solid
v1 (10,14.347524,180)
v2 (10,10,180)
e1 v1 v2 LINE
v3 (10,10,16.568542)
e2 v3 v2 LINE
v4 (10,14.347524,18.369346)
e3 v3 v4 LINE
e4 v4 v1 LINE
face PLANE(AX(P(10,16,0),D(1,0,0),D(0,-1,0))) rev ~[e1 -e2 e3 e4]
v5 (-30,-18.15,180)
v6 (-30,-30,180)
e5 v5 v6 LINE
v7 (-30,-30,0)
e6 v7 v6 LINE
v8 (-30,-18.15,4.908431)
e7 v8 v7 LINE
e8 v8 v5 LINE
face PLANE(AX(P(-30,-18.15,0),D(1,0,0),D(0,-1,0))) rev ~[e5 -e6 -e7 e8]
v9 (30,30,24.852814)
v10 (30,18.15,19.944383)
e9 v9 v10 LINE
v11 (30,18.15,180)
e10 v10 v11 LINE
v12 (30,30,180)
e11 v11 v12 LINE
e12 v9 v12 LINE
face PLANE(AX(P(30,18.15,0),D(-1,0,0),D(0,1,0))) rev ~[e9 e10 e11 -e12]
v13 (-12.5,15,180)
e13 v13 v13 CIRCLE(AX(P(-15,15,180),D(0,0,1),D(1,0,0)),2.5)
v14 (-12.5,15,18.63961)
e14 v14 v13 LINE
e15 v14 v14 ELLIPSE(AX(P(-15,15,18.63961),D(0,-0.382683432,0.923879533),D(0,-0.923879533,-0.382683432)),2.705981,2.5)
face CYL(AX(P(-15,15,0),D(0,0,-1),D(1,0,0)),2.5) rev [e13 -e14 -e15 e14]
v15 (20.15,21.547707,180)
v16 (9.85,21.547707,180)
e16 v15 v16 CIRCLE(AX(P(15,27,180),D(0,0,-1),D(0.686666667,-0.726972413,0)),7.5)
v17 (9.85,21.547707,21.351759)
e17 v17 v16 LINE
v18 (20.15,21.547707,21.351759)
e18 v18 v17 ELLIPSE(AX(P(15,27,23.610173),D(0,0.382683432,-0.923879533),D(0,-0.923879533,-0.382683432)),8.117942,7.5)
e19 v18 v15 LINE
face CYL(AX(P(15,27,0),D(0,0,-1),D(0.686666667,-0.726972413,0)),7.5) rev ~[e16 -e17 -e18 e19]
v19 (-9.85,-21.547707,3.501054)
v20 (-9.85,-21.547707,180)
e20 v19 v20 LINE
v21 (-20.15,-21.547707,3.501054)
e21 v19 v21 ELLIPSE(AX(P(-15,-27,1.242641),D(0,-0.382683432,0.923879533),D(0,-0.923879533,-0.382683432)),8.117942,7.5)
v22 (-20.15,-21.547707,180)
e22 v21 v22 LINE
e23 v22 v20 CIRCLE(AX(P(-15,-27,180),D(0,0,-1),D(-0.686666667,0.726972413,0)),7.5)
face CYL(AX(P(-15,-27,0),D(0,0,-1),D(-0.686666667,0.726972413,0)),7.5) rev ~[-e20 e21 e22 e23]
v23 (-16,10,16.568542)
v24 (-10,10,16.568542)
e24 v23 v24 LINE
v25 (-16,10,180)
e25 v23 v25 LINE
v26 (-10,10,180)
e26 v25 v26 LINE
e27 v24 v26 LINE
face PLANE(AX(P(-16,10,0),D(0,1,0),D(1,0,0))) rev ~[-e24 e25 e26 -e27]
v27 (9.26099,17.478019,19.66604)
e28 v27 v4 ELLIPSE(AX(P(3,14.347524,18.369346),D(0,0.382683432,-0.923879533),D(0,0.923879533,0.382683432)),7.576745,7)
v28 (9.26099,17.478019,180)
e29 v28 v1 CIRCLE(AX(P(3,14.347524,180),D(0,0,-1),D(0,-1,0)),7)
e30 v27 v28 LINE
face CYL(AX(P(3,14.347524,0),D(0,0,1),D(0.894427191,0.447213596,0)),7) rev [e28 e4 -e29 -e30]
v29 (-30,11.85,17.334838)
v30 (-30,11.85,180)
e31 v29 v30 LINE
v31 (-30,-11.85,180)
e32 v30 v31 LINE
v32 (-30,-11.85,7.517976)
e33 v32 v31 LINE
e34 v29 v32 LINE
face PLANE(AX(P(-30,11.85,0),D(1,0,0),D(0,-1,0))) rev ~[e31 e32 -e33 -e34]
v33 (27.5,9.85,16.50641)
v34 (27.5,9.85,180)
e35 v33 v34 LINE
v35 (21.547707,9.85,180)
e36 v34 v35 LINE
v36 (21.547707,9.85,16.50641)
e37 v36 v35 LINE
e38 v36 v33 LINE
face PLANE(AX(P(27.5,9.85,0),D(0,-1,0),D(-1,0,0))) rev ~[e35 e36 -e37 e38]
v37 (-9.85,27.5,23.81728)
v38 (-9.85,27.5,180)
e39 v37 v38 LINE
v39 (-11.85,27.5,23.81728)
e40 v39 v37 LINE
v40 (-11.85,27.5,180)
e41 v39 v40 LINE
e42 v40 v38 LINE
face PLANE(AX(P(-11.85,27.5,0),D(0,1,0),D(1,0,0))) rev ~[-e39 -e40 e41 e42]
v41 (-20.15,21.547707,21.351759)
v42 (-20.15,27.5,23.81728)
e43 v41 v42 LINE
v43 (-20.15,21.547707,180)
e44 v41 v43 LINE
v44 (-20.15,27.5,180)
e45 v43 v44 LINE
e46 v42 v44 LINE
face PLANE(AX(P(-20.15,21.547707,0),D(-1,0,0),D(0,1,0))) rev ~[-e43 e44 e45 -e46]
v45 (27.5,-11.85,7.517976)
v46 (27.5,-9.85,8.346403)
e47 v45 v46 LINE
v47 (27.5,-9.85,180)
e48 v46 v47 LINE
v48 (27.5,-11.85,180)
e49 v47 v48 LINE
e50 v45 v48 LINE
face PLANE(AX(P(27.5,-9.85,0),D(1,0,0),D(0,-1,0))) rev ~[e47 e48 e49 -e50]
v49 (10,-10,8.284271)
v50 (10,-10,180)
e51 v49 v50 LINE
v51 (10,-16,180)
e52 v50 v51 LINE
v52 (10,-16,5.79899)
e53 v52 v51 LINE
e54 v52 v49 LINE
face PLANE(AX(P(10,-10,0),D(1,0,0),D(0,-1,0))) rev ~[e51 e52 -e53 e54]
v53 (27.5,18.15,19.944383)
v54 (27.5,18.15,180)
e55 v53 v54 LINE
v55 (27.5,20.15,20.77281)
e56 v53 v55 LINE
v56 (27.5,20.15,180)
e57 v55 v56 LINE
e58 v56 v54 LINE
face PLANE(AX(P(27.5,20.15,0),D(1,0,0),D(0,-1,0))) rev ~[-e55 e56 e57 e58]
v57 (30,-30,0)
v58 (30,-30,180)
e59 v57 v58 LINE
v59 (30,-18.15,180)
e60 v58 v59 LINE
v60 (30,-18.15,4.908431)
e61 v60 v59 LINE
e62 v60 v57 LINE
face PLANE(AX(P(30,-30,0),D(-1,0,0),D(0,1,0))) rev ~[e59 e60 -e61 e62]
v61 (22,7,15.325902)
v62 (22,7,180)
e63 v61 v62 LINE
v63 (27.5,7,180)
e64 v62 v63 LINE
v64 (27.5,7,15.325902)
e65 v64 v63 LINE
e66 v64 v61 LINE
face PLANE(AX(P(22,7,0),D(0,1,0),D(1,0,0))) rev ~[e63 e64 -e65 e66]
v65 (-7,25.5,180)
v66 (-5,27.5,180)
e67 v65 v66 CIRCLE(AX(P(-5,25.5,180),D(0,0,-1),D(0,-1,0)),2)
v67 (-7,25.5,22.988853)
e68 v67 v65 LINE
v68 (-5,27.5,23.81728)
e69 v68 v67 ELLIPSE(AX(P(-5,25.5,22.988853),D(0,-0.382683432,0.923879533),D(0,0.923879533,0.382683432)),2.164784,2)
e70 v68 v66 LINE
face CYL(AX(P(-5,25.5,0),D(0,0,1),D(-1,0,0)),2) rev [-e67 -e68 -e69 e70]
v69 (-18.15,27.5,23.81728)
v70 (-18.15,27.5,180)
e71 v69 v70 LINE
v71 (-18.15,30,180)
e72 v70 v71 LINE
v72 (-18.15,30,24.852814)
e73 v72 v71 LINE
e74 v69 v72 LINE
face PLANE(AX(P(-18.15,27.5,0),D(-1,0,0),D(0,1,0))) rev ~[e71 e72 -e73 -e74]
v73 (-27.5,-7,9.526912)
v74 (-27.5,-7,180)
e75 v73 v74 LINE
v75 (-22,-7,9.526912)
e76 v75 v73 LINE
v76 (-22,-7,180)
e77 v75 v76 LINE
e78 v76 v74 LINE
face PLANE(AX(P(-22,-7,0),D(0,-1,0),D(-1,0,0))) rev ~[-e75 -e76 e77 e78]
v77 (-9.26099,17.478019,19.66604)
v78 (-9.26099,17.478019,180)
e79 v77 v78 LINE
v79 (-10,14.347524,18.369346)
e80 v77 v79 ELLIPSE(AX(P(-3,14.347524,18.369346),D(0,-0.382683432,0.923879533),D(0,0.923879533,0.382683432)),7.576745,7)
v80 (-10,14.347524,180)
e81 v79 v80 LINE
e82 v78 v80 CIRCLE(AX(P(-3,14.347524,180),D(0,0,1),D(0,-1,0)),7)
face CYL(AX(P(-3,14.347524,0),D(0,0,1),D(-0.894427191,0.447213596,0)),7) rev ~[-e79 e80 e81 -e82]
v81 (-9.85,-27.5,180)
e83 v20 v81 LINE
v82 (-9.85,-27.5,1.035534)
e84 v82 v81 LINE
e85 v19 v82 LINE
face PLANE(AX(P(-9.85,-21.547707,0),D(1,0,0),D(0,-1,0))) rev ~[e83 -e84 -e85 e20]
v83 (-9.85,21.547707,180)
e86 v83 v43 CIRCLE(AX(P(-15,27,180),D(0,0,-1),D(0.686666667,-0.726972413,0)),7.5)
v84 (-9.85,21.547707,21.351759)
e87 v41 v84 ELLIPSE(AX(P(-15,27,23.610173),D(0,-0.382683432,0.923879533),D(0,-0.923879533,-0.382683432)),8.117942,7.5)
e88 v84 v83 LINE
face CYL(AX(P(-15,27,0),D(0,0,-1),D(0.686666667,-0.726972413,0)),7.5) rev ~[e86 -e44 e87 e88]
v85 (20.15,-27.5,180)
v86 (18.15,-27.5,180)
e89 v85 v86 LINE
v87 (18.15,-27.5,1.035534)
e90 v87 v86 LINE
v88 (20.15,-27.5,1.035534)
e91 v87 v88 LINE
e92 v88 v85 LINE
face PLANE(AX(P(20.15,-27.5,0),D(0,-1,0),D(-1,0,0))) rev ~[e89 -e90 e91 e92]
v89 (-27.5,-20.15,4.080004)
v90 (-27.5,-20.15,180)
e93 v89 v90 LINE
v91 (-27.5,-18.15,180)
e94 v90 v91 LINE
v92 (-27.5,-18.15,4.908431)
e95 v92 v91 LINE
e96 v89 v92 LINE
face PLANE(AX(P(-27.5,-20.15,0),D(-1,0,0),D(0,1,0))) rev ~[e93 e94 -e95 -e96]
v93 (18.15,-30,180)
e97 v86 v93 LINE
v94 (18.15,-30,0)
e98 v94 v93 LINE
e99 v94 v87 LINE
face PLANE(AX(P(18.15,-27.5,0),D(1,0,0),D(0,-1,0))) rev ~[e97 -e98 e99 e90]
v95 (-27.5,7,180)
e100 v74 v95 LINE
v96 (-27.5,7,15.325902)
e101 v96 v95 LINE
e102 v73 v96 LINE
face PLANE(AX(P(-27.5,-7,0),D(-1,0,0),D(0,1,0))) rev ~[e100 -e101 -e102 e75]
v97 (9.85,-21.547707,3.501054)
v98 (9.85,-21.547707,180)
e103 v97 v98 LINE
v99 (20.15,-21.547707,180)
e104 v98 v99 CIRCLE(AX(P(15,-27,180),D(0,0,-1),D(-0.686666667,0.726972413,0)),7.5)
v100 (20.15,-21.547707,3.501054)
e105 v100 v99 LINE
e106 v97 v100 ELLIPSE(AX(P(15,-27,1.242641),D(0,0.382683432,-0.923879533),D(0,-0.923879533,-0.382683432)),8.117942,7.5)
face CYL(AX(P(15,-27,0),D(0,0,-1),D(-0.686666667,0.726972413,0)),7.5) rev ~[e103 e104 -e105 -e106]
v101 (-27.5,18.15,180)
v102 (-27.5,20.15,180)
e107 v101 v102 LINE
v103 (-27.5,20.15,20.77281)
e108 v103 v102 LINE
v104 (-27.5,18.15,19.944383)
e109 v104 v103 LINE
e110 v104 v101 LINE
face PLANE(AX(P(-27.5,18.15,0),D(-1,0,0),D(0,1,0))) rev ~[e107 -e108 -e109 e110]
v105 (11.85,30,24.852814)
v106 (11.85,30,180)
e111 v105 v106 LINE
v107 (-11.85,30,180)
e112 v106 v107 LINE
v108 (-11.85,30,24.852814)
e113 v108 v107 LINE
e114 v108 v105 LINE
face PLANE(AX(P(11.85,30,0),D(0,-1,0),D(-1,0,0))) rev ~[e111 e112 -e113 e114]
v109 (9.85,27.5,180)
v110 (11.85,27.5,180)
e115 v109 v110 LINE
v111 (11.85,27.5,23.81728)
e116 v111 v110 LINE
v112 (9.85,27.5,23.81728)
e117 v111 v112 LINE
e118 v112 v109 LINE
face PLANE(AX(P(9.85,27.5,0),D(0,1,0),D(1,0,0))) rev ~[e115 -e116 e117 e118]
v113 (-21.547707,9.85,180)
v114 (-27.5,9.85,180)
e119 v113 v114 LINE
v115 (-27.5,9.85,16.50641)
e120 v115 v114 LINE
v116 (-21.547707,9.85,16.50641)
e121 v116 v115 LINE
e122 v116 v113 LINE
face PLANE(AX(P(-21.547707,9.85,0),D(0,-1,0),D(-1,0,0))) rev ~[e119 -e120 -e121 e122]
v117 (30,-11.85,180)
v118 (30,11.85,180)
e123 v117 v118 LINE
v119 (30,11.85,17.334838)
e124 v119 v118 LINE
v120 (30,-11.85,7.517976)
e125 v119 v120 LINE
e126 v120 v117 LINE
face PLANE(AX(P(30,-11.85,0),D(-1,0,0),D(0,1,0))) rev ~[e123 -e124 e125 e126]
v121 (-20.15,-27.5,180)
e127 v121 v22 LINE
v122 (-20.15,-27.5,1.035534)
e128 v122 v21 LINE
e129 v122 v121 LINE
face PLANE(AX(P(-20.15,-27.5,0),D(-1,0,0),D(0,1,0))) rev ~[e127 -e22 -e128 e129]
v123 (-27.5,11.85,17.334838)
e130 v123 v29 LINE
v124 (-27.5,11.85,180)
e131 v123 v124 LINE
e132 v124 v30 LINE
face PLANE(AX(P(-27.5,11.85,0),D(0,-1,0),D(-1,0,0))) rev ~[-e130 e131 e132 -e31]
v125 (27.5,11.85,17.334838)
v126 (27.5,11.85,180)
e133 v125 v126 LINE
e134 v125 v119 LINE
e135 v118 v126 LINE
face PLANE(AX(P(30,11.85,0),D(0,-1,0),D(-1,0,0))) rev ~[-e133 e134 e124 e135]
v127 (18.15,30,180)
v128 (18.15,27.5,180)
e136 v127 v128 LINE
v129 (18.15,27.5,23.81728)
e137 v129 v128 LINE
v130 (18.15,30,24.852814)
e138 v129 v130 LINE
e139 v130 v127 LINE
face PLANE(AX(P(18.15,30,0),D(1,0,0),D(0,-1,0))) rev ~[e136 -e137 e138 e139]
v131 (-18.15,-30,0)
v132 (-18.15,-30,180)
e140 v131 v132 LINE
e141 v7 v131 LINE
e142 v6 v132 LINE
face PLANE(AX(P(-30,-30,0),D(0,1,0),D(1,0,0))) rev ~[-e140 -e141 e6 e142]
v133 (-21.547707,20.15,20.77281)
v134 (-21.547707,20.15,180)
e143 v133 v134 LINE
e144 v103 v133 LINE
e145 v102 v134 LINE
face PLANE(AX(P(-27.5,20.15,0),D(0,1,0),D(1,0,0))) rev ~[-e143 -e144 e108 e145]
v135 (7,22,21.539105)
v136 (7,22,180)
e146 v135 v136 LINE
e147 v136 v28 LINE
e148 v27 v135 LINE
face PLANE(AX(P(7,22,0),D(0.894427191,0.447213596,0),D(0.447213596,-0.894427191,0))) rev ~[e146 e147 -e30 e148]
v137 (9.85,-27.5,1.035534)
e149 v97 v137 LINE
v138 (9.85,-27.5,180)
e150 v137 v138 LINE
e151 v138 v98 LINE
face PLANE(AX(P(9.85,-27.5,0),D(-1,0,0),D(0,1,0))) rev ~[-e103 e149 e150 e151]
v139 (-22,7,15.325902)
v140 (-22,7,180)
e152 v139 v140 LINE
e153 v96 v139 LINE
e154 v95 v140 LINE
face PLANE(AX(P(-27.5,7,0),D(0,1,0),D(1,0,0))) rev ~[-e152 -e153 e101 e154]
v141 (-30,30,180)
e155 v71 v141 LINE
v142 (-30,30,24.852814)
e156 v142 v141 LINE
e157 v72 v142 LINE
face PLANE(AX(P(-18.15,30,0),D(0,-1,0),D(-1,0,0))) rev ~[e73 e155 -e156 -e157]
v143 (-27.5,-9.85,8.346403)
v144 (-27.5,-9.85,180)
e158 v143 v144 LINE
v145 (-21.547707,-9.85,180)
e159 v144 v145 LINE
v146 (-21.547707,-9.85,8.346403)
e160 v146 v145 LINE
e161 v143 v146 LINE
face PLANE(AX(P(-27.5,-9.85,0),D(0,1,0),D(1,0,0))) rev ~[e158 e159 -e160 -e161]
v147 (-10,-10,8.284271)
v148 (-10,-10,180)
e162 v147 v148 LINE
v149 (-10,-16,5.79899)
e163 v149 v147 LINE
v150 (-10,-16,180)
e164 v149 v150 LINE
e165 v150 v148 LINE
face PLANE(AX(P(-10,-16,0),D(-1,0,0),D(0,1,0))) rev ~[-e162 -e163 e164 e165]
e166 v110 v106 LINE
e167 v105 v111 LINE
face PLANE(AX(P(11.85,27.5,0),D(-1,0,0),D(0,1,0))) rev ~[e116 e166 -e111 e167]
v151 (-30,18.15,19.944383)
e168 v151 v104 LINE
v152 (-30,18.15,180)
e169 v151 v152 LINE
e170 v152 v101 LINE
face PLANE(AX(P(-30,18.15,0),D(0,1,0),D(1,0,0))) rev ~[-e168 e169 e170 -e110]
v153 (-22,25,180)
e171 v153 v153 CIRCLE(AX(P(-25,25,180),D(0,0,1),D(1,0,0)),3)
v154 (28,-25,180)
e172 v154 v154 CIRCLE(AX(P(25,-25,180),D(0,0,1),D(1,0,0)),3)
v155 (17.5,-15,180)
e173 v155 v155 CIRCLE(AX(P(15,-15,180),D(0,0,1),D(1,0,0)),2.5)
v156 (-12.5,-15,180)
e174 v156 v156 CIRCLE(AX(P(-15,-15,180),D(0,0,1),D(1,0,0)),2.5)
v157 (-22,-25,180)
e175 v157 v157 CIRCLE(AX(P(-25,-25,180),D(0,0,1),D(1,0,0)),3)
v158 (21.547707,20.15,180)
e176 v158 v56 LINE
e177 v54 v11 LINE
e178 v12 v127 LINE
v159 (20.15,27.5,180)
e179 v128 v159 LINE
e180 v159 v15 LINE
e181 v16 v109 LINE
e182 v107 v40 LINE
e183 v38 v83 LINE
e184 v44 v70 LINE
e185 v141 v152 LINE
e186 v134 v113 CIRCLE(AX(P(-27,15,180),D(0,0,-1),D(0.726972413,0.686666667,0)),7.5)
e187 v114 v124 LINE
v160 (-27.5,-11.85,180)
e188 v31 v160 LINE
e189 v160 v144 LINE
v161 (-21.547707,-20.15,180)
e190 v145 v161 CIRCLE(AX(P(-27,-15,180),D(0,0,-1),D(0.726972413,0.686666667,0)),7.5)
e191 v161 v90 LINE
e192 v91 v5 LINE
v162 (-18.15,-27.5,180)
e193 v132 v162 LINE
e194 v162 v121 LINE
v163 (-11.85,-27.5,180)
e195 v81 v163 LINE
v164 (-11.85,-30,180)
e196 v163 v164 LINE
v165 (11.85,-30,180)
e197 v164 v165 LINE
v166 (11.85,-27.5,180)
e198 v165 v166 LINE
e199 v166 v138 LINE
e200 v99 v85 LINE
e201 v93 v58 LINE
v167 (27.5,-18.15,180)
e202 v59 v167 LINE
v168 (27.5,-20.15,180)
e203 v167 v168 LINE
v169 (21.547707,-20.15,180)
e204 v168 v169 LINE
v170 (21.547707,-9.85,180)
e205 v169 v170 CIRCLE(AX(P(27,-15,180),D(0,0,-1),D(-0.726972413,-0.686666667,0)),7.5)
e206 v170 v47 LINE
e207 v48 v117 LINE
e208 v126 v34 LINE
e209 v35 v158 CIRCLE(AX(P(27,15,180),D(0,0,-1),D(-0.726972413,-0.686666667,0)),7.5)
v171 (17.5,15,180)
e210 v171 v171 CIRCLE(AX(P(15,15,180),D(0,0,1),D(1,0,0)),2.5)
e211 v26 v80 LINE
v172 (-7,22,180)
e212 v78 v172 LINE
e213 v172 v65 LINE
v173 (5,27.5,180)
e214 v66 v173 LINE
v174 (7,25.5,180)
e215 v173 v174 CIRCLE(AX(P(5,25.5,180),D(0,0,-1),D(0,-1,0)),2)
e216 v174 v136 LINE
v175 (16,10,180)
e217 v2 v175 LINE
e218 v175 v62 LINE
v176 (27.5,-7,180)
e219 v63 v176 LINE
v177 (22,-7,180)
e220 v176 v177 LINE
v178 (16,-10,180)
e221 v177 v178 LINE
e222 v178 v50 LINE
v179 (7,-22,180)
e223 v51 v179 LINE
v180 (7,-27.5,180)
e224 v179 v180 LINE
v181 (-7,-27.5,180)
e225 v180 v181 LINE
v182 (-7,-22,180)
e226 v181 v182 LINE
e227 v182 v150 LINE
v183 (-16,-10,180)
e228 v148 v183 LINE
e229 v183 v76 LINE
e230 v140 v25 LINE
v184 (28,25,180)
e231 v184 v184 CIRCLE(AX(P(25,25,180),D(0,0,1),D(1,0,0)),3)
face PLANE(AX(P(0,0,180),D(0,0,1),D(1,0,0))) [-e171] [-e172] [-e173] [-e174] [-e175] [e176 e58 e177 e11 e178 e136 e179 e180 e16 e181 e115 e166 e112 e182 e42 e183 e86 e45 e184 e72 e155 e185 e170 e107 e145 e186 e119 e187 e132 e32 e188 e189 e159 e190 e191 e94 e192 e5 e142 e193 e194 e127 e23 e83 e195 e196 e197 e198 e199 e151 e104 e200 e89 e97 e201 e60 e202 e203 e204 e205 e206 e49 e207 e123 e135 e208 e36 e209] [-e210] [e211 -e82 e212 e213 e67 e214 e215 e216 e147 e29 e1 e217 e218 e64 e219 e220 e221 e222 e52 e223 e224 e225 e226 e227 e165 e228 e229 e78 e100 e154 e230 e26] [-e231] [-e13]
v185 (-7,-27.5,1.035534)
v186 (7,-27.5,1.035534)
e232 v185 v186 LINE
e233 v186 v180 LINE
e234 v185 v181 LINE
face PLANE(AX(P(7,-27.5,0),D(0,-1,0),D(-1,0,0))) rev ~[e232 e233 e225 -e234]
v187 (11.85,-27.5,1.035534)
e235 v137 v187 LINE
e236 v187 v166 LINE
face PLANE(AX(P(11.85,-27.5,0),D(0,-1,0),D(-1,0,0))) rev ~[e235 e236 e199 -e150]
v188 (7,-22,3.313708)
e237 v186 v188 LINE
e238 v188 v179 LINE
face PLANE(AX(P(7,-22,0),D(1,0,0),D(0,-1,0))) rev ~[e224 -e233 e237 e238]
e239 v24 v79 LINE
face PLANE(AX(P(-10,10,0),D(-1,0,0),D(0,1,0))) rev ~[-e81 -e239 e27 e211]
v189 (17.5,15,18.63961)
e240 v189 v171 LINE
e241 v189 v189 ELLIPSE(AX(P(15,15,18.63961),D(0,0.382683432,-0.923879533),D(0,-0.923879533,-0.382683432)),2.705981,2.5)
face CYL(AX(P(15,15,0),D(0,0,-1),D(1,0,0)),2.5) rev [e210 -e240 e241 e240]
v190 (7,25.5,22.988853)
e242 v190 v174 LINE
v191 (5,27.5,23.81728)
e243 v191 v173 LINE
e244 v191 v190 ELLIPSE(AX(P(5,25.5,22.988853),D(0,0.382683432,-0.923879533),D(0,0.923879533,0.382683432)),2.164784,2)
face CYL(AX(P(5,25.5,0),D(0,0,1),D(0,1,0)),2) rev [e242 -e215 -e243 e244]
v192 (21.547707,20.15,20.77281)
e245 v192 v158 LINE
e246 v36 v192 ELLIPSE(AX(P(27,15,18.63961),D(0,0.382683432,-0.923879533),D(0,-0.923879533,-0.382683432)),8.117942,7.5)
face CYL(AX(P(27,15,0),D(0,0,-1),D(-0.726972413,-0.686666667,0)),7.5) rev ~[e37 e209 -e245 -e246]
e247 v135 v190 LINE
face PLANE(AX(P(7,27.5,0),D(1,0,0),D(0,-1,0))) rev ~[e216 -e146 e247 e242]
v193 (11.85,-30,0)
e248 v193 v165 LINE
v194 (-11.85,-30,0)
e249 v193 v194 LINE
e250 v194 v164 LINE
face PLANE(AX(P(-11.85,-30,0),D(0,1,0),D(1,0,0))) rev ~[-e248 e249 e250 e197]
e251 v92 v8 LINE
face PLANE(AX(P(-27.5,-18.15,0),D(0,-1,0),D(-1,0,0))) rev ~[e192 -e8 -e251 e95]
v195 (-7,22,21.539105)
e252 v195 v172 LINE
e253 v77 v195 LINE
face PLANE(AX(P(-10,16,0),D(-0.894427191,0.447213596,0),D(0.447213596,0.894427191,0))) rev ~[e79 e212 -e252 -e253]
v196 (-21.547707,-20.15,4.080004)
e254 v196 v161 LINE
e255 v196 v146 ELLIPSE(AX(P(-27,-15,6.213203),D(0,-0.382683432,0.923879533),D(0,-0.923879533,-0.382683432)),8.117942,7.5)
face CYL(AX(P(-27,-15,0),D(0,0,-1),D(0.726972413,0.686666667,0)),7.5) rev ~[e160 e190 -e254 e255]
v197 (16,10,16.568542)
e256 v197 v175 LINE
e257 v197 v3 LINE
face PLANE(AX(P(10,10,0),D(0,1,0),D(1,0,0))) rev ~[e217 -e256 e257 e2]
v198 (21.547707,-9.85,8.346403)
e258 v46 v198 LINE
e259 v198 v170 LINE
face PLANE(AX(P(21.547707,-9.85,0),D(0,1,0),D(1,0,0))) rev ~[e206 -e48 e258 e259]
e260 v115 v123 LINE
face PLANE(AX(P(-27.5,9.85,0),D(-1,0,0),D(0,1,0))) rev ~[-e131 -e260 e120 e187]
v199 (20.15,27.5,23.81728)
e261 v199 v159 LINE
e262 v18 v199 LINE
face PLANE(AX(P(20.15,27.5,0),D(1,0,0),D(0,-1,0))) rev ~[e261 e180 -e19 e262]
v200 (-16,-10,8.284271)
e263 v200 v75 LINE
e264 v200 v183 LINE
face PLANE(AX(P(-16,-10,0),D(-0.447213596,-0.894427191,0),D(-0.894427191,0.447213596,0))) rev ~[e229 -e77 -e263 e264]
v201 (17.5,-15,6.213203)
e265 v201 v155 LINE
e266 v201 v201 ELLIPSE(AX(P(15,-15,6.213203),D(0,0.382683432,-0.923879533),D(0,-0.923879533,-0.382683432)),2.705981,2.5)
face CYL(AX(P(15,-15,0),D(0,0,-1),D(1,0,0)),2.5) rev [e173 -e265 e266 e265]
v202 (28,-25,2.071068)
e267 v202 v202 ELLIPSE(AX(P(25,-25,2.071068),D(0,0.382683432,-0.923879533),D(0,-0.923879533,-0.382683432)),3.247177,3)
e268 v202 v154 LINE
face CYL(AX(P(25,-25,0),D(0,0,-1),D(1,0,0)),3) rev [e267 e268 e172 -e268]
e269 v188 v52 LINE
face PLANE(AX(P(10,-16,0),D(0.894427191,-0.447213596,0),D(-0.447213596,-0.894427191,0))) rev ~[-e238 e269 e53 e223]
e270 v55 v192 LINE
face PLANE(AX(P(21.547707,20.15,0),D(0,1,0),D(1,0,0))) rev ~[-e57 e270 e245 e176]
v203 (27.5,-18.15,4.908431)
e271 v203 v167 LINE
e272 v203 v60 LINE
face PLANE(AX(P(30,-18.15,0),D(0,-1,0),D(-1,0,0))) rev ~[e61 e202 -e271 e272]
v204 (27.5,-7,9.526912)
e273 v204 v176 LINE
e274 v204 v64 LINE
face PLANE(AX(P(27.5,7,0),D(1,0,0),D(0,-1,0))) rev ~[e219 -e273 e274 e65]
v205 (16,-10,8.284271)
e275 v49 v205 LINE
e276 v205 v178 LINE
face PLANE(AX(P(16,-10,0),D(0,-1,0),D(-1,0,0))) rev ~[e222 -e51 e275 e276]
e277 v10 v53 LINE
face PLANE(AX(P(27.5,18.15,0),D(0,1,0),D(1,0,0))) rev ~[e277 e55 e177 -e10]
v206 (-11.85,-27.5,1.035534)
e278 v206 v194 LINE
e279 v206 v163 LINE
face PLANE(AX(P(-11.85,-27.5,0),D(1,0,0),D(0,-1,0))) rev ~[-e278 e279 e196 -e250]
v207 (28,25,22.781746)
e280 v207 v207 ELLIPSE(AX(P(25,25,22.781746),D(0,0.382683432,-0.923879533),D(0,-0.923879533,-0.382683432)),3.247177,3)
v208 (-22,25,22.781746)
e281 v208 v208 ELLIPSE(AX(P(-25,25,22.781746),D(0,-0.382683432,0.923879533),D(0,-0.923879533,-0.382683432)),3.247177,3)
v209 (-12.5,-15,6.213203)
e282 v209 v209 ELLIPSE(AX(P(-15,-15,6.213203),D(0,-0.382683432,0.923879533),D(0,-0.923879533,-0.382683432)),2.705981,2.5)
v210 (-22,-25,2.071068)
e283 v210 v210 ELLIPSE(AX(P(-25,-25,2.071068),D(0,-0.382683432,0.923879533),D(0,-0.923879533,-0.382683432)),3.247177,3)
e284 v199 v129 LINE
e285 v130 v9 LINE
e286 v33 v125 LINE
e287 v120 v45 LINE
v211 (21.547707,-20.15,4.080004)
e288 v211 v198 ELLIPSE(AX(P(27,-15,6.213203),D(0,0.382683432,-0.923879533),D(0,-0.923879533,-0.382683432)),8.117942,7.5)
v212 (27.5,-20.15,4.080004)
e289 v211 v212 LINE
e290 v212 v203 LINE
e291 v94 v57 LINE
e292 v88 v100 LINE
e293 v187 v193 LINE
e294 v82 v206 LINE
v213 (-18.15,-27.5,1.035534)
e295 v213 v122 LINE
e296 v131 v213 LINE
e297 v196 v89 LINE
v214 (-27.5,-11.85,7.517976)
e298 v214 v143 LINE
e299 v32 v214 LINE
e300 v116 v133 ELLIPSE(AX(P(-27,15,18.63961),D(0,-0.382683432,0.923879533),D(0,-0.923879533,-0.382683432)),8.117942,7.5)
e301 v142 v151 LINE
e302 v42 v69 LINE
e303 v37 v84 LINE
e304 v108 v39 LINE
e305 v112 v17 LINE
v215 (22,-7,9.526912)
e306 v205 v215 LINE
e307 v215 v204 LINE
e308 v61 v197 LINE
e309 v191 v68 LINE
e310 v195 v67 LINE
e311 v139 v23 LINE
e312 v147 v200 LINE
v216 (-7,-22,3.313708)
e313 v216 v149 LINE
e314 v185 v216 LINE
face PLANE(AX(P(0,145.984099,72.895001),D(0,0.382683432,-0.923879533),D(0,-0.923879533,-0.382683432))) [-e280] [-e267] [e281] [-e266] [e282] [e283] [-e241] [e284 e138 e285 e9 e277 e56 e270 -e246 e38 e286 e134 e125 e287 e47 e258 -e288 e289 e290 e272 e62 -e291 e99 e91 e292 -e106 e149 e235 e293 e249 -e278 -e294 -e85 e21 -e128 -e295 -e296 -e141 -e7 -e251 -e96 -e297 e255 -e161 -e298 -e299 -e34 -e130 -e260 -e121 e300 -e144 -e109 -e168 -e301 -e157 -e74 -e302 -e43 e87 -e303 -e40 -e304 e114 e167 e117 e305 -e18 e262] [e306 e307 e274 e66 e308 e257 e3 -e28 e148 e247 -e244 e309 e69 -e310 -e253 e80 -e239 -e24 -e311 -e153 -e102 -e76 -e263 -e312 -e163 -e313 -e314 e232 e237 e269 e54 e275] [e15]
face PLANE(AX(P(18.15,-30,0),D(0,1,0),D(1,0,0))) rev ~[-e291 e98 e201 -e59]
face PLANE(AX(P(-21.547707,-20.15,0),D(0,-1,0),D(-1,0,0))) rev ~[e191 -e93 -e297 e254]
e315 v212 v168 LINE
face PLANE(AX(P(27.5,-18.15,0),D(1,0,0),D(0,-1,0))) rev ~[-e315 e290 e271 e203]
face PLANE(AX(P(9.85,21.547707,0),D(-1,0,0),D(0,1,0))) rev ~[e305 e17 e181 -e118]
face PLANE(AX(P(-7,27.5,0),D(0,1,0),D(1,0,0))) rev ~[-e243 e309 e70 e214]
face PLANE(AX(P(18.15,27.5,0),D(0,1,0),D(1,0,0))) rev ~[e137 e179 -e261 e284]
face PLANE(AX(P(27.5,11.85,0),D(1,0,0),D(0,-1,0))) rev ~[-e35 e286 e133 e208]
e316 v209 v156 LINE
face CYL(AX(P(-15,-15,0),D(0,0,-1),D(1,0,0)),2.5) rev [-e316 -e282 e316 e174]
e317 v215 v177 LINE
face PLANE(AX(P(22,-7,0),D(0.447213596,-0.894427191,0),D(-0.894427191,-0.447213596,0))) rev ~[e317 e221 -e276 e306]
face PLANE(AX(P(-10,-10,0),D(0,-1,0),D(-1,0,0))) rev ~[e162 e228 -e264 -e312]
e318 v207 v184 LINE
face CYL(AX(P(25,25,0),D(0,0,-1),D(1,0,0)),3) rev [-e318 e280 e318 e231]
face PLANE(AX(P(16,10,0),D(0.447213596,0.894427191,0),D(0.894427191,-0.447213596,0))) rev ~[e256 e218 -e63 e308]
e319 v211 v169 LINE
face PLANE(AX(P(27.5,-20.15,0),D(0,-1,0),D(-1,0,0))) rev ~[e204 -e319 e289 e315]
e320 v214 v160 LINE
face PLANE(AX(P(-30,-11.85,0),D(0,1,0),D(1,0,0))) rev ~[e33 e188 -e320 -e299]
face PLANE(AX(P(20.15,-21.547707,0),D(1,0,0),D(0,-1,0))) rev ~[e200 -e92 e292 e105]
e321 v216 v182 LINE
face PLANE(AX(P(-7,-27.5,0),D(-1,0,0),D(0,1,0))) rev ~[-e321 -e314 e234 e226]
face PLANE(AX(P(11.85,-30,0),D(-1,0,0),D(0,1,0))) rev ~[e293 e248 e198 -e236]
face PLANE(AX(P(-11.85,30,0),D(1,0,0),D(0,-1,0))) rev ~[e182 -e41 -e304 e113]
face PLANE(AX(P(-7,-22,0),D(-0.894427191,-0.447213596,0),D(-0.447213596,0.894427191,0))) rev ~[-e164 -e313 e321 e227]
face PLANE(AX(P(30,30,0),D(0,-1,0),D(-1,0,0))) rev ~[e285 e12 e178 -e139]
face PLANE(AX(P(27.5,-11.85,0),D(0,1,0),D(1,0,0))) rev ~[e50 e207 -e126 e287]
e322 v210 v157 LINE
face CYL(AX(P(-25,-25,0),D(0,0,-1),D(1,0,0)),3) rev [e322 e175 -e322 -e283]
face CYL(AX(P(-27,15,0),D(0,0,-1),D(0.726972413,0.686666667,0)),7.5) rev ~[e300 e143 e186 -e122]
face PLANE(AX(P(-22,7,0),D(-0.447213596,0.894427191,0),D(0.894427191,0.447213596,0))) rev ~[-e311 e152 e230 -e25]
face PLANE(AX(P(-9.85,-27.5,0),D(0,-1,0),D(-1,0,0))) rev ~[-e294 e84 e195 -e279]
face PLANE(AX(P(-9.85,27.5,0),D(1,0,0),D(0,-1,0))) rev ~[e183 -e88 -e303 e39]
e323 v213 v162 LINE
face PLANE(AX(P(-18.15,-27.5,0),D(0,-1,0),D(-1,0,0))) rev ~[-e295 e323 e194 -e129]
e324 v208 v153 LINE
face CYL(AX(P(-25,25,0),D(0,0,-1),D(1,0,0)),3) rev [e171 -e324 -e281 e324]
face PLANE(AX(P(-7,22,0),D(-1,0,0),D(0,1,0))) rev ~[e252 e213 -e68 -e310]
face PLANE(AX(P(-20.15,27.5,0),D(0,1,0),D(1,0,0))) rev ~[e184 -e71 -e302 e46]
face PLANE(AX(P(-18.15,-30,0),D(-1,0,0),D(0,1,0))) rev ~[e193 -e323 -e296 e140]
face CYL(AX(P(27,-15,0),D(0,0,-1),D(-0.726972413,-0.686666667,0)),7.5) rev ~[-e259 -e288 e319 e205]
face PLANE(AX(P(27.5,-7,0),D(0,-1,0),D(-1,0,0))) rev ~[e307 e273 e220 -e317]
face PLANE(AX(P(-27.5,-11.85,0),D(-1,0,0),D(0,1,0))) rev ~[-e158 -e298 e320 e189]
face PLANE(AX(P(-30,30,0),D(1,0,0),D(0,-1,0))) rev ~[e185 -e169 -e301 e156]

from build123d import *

# Parameters (mm, degrees)
F0_R          = 3
F0_R_2        = 2.5
F1_DEPTH      = 180
F2_R          = 2
F3_R          = 7
F6_DEPTH      = 30
F6_DEPTH_BACK = 30


# Not quite as in the source:
# - a feature names something its author has since deleted; it is built from what else it names


with BuildPart() as f1:
    # F0 (on Top) → F1 (new body)
    with BuildSketch(Plane.XY):
        with BuildLine():
            Line((18.15, -30), (30, -30))
            Line((30, -30), (30, -18.15))
            Line((30, -18.15), (27.5, -18.15))
            Line((27.5, -18.15), (27.5, -20.15))
            Line((27.5, -20.15), (21.5477069044, -20.15))
            ThreePointArc((21.5477069044, -20.15), (19.5, -15), (21.5477069044, -9.85))
            Line((21.5477069044, -9.85), (27.5, -9.85))
            Line((27.5, -9.85), (27.5, -11.85))
            Line((27.5, -11.85), (30, -11.85))
            Line((30, -11.85), (30, 11.85))
            Line((30, 11.85), (27.5, 11.85))
            Line((27.5, 11.85), (27.5, 9.85))
            Line((27.5, 9.85), (21.5477069044, 9.85))
            ThreePointArc((21.5477069044, 9.85), (19.5, 15), (21.5477069044, 20.15))
            Line((21.5477069044, 20.15), (27.5, 20.15))
            Line((27.5, 20.15), (27.5, 18.15))
            Line((27.5, 18.15), (30, 18.15))
            Line((30, 18.15), (30, 30))
            Line((30, 30), (18.15, 30))
            Line((18.15, 30), (18.15, 27.5))
            Line((18.15, 27.5), (20.15, 27.5))
            Line((20.15, 27.5), (20.15, 21.5477069044))
            ThreePointArc((20.15, 21.5477069044), (15, 19.5), (9.85, 21.5477069044))
            Line((9.85, 21.5477069044), (9.85, 27.5))
            Line((9.85, 27.5), (11.85, 27.5))
            Line((11.85, 27.5), (11.85, 30))
            Line((11.85, 30), (-11.85, 30))
            Line((-11.85, 30), (-11.85, 27.5))
            Line((-11.85, 27.5), (-9.85, 27.5))
            Line((-9.85, 27.5), (-9.85, 21.5477069044))
            ThreePointArc((-9.85, 21.5477069044), (-15, 19.5), (-20.15, 21.5477069044))
            Line((-20.15, 21.5477069044), (-20.15, 27.5))
            Line((-20.15, 27.5), (-18.15, 27.5))
            Line((-18.15, 27.5), (-18.15, 30))
            Line((-18.15, 30), (-30, 30))
            Line((-30, 30), (-30, 18.15))
            Line((-30, 18.15), (-27.5, 18.15))
            Line((-27.5, 18.15), (-27.5, 20.15))
            Line((-27.5, 20.15), (-21.5477069044, 20.15))
            ThreePointArc((-21.5477069044, 20.15), (-19.5, 15), (-21.5477069044, 9.85))
            Line((-21.5477069044, 9.85), (-27.5, 9.85))
            Line((-27.5, 9.85), (-27.5, 11.85))
            Line((-27.5, 11.85), (-30, 11.85))
            Line((-30, 11.85), (-30, -11.85))
            Line((-30, -11.85), (-27.5, -11.85))
            Line((-27.5, -11.85), (-27.5, -9.85))
            Line((-27.5, -9.85), (-21.5477069044, -9.85))
            ThreePointArc((-21.5477069044, -9.85), (-19.5, -15), (-21.5477069044, -20.15))
            Line((-21.5477069044, -20.15), (-27.5, -20.15))
            Line((-27.5, -20.15), (-27.5, -18.15))
            Line((-27.5, -18.15), (-30, -18.15))
            Line((-30, -18.15), (-30, -30))
            Line((-30, -30), (-18.15, -30))
            Line((-18.15, -30), (-18.15, -27.5))
            Line((-18.15, -27.5), (-20.15, -27.5))
            Line((-20.15, -27.5), (-20.15, -21.5477069044))
            ThreePointArc((-20.15, -21.5477069044), (-15, -19.5), (-9.85, -21.5477069044))
            Line((-9.85, -21.5477069044), (-9.85, -27.5))
            Line((-9.85, -27.5), (-11.85, -27.5))
            Line((-11.85, -27.5), (-11.85, -30))
            Line((-11.85, -30), (11.85, -30))
            Line((11.85, -30), (11.85, -27.5))
            Line((11.85, -27.5), (9.85, -27.5))
            Line((9.85, -27.5), (9.85, -21.5477069044))
            ThreePointArc((9.85, -21.5477069044), (15, -19.5), (20.15, -21.5477069044))
            Line((20.15, -21.5477069044), (20.15, -27.5))
            Line((20.15, -27.5), (18.15, -27.5))
            Line((18.15, -27.5), (18.15, -30))
        make_face()
        with Locations((-25, -25)):
            Circle(F0_R, mode=Mode.SUBTRACT)
        with Locations((-15, -15)):
            Circle(F0_R_2, mode=Mode.SUBTRACT)
        with Locations((25, -25)):
            Circle(F0_R, mode=Mode.SUBTRACT)
        with Locations((15, -15)):
            Circle(F0_R_2, mode=Mode.SUBTRACT)
        with Locations((-25, 25)):
            Circle(F0_R, mode=Mode.SUBTRACT)
        with Locations((-15, 15)):
            Circle(F0_R_2, mode=Mode.SUBTRACT)
        Polygon((-7, 22), (-7, 27.5), (0, 27.5), (7, 27.5), (7, 22), (10, 16), (10, 10), (16, 10), (22, 7), (27.5, 7), (27.5, 0), (27.5, -7), (22, -7), (16, -10), (10, -10), (10, -16), (7, -22), (7, -27.5), (0, -27.5), (-7, -27.5), (-7, -22), (-10, -16), (-10, -10), (-16, -10), (-22, -7), (-27.5, -7), (-27.5, 0), (-27.5, 7), (-22, 7), (-16, 10), (-10, 10), (-10, 16), align=None, mode=Mode.SUBTRACT)
        with Locations((15, 15)):
            Circle(F0_R_2, mode=Mode.SUBTRACT)
        with Locations((25, 25)):
            Circle(F0_R, mode=Mode.SUBTRACT)
    extrude(amount=F1_DEPTH)

    # F2
    f2_edges = [f1.edges().sort_by_distance(p)[0] for p in [
        (-7, 27.5, 90),
        (7, 27.5, 90),
    ]]
    fillet(f2_edges, radius=F2_R)

    # F3
    f3_edges = [f1.edges().sort_by_distance(p)[0] for p in [
        (-10, 16, 90),
        (10, 16, 90),
    ]]
    fillet(f3_edges, radius=F3_R)

    # F5 (on Right) → F6 (cut, two sides)
    with BuildSketch(Plane.YZ) as f6_sk:
        Polygon((189.0217391842, -31.0070544887), (145.9840988475, 72.8950005046), (-30, 0), (13.0376403367, -103.9020549933), align=None)
    extrude(amount=-F6_DEPTH, mode=Mode.SUBTRACT)
    extrude(f6_sk.sketch, amount=F6_DEPTH_BACK, mode=Mode.SUBTRACT)


solid = f1.part
